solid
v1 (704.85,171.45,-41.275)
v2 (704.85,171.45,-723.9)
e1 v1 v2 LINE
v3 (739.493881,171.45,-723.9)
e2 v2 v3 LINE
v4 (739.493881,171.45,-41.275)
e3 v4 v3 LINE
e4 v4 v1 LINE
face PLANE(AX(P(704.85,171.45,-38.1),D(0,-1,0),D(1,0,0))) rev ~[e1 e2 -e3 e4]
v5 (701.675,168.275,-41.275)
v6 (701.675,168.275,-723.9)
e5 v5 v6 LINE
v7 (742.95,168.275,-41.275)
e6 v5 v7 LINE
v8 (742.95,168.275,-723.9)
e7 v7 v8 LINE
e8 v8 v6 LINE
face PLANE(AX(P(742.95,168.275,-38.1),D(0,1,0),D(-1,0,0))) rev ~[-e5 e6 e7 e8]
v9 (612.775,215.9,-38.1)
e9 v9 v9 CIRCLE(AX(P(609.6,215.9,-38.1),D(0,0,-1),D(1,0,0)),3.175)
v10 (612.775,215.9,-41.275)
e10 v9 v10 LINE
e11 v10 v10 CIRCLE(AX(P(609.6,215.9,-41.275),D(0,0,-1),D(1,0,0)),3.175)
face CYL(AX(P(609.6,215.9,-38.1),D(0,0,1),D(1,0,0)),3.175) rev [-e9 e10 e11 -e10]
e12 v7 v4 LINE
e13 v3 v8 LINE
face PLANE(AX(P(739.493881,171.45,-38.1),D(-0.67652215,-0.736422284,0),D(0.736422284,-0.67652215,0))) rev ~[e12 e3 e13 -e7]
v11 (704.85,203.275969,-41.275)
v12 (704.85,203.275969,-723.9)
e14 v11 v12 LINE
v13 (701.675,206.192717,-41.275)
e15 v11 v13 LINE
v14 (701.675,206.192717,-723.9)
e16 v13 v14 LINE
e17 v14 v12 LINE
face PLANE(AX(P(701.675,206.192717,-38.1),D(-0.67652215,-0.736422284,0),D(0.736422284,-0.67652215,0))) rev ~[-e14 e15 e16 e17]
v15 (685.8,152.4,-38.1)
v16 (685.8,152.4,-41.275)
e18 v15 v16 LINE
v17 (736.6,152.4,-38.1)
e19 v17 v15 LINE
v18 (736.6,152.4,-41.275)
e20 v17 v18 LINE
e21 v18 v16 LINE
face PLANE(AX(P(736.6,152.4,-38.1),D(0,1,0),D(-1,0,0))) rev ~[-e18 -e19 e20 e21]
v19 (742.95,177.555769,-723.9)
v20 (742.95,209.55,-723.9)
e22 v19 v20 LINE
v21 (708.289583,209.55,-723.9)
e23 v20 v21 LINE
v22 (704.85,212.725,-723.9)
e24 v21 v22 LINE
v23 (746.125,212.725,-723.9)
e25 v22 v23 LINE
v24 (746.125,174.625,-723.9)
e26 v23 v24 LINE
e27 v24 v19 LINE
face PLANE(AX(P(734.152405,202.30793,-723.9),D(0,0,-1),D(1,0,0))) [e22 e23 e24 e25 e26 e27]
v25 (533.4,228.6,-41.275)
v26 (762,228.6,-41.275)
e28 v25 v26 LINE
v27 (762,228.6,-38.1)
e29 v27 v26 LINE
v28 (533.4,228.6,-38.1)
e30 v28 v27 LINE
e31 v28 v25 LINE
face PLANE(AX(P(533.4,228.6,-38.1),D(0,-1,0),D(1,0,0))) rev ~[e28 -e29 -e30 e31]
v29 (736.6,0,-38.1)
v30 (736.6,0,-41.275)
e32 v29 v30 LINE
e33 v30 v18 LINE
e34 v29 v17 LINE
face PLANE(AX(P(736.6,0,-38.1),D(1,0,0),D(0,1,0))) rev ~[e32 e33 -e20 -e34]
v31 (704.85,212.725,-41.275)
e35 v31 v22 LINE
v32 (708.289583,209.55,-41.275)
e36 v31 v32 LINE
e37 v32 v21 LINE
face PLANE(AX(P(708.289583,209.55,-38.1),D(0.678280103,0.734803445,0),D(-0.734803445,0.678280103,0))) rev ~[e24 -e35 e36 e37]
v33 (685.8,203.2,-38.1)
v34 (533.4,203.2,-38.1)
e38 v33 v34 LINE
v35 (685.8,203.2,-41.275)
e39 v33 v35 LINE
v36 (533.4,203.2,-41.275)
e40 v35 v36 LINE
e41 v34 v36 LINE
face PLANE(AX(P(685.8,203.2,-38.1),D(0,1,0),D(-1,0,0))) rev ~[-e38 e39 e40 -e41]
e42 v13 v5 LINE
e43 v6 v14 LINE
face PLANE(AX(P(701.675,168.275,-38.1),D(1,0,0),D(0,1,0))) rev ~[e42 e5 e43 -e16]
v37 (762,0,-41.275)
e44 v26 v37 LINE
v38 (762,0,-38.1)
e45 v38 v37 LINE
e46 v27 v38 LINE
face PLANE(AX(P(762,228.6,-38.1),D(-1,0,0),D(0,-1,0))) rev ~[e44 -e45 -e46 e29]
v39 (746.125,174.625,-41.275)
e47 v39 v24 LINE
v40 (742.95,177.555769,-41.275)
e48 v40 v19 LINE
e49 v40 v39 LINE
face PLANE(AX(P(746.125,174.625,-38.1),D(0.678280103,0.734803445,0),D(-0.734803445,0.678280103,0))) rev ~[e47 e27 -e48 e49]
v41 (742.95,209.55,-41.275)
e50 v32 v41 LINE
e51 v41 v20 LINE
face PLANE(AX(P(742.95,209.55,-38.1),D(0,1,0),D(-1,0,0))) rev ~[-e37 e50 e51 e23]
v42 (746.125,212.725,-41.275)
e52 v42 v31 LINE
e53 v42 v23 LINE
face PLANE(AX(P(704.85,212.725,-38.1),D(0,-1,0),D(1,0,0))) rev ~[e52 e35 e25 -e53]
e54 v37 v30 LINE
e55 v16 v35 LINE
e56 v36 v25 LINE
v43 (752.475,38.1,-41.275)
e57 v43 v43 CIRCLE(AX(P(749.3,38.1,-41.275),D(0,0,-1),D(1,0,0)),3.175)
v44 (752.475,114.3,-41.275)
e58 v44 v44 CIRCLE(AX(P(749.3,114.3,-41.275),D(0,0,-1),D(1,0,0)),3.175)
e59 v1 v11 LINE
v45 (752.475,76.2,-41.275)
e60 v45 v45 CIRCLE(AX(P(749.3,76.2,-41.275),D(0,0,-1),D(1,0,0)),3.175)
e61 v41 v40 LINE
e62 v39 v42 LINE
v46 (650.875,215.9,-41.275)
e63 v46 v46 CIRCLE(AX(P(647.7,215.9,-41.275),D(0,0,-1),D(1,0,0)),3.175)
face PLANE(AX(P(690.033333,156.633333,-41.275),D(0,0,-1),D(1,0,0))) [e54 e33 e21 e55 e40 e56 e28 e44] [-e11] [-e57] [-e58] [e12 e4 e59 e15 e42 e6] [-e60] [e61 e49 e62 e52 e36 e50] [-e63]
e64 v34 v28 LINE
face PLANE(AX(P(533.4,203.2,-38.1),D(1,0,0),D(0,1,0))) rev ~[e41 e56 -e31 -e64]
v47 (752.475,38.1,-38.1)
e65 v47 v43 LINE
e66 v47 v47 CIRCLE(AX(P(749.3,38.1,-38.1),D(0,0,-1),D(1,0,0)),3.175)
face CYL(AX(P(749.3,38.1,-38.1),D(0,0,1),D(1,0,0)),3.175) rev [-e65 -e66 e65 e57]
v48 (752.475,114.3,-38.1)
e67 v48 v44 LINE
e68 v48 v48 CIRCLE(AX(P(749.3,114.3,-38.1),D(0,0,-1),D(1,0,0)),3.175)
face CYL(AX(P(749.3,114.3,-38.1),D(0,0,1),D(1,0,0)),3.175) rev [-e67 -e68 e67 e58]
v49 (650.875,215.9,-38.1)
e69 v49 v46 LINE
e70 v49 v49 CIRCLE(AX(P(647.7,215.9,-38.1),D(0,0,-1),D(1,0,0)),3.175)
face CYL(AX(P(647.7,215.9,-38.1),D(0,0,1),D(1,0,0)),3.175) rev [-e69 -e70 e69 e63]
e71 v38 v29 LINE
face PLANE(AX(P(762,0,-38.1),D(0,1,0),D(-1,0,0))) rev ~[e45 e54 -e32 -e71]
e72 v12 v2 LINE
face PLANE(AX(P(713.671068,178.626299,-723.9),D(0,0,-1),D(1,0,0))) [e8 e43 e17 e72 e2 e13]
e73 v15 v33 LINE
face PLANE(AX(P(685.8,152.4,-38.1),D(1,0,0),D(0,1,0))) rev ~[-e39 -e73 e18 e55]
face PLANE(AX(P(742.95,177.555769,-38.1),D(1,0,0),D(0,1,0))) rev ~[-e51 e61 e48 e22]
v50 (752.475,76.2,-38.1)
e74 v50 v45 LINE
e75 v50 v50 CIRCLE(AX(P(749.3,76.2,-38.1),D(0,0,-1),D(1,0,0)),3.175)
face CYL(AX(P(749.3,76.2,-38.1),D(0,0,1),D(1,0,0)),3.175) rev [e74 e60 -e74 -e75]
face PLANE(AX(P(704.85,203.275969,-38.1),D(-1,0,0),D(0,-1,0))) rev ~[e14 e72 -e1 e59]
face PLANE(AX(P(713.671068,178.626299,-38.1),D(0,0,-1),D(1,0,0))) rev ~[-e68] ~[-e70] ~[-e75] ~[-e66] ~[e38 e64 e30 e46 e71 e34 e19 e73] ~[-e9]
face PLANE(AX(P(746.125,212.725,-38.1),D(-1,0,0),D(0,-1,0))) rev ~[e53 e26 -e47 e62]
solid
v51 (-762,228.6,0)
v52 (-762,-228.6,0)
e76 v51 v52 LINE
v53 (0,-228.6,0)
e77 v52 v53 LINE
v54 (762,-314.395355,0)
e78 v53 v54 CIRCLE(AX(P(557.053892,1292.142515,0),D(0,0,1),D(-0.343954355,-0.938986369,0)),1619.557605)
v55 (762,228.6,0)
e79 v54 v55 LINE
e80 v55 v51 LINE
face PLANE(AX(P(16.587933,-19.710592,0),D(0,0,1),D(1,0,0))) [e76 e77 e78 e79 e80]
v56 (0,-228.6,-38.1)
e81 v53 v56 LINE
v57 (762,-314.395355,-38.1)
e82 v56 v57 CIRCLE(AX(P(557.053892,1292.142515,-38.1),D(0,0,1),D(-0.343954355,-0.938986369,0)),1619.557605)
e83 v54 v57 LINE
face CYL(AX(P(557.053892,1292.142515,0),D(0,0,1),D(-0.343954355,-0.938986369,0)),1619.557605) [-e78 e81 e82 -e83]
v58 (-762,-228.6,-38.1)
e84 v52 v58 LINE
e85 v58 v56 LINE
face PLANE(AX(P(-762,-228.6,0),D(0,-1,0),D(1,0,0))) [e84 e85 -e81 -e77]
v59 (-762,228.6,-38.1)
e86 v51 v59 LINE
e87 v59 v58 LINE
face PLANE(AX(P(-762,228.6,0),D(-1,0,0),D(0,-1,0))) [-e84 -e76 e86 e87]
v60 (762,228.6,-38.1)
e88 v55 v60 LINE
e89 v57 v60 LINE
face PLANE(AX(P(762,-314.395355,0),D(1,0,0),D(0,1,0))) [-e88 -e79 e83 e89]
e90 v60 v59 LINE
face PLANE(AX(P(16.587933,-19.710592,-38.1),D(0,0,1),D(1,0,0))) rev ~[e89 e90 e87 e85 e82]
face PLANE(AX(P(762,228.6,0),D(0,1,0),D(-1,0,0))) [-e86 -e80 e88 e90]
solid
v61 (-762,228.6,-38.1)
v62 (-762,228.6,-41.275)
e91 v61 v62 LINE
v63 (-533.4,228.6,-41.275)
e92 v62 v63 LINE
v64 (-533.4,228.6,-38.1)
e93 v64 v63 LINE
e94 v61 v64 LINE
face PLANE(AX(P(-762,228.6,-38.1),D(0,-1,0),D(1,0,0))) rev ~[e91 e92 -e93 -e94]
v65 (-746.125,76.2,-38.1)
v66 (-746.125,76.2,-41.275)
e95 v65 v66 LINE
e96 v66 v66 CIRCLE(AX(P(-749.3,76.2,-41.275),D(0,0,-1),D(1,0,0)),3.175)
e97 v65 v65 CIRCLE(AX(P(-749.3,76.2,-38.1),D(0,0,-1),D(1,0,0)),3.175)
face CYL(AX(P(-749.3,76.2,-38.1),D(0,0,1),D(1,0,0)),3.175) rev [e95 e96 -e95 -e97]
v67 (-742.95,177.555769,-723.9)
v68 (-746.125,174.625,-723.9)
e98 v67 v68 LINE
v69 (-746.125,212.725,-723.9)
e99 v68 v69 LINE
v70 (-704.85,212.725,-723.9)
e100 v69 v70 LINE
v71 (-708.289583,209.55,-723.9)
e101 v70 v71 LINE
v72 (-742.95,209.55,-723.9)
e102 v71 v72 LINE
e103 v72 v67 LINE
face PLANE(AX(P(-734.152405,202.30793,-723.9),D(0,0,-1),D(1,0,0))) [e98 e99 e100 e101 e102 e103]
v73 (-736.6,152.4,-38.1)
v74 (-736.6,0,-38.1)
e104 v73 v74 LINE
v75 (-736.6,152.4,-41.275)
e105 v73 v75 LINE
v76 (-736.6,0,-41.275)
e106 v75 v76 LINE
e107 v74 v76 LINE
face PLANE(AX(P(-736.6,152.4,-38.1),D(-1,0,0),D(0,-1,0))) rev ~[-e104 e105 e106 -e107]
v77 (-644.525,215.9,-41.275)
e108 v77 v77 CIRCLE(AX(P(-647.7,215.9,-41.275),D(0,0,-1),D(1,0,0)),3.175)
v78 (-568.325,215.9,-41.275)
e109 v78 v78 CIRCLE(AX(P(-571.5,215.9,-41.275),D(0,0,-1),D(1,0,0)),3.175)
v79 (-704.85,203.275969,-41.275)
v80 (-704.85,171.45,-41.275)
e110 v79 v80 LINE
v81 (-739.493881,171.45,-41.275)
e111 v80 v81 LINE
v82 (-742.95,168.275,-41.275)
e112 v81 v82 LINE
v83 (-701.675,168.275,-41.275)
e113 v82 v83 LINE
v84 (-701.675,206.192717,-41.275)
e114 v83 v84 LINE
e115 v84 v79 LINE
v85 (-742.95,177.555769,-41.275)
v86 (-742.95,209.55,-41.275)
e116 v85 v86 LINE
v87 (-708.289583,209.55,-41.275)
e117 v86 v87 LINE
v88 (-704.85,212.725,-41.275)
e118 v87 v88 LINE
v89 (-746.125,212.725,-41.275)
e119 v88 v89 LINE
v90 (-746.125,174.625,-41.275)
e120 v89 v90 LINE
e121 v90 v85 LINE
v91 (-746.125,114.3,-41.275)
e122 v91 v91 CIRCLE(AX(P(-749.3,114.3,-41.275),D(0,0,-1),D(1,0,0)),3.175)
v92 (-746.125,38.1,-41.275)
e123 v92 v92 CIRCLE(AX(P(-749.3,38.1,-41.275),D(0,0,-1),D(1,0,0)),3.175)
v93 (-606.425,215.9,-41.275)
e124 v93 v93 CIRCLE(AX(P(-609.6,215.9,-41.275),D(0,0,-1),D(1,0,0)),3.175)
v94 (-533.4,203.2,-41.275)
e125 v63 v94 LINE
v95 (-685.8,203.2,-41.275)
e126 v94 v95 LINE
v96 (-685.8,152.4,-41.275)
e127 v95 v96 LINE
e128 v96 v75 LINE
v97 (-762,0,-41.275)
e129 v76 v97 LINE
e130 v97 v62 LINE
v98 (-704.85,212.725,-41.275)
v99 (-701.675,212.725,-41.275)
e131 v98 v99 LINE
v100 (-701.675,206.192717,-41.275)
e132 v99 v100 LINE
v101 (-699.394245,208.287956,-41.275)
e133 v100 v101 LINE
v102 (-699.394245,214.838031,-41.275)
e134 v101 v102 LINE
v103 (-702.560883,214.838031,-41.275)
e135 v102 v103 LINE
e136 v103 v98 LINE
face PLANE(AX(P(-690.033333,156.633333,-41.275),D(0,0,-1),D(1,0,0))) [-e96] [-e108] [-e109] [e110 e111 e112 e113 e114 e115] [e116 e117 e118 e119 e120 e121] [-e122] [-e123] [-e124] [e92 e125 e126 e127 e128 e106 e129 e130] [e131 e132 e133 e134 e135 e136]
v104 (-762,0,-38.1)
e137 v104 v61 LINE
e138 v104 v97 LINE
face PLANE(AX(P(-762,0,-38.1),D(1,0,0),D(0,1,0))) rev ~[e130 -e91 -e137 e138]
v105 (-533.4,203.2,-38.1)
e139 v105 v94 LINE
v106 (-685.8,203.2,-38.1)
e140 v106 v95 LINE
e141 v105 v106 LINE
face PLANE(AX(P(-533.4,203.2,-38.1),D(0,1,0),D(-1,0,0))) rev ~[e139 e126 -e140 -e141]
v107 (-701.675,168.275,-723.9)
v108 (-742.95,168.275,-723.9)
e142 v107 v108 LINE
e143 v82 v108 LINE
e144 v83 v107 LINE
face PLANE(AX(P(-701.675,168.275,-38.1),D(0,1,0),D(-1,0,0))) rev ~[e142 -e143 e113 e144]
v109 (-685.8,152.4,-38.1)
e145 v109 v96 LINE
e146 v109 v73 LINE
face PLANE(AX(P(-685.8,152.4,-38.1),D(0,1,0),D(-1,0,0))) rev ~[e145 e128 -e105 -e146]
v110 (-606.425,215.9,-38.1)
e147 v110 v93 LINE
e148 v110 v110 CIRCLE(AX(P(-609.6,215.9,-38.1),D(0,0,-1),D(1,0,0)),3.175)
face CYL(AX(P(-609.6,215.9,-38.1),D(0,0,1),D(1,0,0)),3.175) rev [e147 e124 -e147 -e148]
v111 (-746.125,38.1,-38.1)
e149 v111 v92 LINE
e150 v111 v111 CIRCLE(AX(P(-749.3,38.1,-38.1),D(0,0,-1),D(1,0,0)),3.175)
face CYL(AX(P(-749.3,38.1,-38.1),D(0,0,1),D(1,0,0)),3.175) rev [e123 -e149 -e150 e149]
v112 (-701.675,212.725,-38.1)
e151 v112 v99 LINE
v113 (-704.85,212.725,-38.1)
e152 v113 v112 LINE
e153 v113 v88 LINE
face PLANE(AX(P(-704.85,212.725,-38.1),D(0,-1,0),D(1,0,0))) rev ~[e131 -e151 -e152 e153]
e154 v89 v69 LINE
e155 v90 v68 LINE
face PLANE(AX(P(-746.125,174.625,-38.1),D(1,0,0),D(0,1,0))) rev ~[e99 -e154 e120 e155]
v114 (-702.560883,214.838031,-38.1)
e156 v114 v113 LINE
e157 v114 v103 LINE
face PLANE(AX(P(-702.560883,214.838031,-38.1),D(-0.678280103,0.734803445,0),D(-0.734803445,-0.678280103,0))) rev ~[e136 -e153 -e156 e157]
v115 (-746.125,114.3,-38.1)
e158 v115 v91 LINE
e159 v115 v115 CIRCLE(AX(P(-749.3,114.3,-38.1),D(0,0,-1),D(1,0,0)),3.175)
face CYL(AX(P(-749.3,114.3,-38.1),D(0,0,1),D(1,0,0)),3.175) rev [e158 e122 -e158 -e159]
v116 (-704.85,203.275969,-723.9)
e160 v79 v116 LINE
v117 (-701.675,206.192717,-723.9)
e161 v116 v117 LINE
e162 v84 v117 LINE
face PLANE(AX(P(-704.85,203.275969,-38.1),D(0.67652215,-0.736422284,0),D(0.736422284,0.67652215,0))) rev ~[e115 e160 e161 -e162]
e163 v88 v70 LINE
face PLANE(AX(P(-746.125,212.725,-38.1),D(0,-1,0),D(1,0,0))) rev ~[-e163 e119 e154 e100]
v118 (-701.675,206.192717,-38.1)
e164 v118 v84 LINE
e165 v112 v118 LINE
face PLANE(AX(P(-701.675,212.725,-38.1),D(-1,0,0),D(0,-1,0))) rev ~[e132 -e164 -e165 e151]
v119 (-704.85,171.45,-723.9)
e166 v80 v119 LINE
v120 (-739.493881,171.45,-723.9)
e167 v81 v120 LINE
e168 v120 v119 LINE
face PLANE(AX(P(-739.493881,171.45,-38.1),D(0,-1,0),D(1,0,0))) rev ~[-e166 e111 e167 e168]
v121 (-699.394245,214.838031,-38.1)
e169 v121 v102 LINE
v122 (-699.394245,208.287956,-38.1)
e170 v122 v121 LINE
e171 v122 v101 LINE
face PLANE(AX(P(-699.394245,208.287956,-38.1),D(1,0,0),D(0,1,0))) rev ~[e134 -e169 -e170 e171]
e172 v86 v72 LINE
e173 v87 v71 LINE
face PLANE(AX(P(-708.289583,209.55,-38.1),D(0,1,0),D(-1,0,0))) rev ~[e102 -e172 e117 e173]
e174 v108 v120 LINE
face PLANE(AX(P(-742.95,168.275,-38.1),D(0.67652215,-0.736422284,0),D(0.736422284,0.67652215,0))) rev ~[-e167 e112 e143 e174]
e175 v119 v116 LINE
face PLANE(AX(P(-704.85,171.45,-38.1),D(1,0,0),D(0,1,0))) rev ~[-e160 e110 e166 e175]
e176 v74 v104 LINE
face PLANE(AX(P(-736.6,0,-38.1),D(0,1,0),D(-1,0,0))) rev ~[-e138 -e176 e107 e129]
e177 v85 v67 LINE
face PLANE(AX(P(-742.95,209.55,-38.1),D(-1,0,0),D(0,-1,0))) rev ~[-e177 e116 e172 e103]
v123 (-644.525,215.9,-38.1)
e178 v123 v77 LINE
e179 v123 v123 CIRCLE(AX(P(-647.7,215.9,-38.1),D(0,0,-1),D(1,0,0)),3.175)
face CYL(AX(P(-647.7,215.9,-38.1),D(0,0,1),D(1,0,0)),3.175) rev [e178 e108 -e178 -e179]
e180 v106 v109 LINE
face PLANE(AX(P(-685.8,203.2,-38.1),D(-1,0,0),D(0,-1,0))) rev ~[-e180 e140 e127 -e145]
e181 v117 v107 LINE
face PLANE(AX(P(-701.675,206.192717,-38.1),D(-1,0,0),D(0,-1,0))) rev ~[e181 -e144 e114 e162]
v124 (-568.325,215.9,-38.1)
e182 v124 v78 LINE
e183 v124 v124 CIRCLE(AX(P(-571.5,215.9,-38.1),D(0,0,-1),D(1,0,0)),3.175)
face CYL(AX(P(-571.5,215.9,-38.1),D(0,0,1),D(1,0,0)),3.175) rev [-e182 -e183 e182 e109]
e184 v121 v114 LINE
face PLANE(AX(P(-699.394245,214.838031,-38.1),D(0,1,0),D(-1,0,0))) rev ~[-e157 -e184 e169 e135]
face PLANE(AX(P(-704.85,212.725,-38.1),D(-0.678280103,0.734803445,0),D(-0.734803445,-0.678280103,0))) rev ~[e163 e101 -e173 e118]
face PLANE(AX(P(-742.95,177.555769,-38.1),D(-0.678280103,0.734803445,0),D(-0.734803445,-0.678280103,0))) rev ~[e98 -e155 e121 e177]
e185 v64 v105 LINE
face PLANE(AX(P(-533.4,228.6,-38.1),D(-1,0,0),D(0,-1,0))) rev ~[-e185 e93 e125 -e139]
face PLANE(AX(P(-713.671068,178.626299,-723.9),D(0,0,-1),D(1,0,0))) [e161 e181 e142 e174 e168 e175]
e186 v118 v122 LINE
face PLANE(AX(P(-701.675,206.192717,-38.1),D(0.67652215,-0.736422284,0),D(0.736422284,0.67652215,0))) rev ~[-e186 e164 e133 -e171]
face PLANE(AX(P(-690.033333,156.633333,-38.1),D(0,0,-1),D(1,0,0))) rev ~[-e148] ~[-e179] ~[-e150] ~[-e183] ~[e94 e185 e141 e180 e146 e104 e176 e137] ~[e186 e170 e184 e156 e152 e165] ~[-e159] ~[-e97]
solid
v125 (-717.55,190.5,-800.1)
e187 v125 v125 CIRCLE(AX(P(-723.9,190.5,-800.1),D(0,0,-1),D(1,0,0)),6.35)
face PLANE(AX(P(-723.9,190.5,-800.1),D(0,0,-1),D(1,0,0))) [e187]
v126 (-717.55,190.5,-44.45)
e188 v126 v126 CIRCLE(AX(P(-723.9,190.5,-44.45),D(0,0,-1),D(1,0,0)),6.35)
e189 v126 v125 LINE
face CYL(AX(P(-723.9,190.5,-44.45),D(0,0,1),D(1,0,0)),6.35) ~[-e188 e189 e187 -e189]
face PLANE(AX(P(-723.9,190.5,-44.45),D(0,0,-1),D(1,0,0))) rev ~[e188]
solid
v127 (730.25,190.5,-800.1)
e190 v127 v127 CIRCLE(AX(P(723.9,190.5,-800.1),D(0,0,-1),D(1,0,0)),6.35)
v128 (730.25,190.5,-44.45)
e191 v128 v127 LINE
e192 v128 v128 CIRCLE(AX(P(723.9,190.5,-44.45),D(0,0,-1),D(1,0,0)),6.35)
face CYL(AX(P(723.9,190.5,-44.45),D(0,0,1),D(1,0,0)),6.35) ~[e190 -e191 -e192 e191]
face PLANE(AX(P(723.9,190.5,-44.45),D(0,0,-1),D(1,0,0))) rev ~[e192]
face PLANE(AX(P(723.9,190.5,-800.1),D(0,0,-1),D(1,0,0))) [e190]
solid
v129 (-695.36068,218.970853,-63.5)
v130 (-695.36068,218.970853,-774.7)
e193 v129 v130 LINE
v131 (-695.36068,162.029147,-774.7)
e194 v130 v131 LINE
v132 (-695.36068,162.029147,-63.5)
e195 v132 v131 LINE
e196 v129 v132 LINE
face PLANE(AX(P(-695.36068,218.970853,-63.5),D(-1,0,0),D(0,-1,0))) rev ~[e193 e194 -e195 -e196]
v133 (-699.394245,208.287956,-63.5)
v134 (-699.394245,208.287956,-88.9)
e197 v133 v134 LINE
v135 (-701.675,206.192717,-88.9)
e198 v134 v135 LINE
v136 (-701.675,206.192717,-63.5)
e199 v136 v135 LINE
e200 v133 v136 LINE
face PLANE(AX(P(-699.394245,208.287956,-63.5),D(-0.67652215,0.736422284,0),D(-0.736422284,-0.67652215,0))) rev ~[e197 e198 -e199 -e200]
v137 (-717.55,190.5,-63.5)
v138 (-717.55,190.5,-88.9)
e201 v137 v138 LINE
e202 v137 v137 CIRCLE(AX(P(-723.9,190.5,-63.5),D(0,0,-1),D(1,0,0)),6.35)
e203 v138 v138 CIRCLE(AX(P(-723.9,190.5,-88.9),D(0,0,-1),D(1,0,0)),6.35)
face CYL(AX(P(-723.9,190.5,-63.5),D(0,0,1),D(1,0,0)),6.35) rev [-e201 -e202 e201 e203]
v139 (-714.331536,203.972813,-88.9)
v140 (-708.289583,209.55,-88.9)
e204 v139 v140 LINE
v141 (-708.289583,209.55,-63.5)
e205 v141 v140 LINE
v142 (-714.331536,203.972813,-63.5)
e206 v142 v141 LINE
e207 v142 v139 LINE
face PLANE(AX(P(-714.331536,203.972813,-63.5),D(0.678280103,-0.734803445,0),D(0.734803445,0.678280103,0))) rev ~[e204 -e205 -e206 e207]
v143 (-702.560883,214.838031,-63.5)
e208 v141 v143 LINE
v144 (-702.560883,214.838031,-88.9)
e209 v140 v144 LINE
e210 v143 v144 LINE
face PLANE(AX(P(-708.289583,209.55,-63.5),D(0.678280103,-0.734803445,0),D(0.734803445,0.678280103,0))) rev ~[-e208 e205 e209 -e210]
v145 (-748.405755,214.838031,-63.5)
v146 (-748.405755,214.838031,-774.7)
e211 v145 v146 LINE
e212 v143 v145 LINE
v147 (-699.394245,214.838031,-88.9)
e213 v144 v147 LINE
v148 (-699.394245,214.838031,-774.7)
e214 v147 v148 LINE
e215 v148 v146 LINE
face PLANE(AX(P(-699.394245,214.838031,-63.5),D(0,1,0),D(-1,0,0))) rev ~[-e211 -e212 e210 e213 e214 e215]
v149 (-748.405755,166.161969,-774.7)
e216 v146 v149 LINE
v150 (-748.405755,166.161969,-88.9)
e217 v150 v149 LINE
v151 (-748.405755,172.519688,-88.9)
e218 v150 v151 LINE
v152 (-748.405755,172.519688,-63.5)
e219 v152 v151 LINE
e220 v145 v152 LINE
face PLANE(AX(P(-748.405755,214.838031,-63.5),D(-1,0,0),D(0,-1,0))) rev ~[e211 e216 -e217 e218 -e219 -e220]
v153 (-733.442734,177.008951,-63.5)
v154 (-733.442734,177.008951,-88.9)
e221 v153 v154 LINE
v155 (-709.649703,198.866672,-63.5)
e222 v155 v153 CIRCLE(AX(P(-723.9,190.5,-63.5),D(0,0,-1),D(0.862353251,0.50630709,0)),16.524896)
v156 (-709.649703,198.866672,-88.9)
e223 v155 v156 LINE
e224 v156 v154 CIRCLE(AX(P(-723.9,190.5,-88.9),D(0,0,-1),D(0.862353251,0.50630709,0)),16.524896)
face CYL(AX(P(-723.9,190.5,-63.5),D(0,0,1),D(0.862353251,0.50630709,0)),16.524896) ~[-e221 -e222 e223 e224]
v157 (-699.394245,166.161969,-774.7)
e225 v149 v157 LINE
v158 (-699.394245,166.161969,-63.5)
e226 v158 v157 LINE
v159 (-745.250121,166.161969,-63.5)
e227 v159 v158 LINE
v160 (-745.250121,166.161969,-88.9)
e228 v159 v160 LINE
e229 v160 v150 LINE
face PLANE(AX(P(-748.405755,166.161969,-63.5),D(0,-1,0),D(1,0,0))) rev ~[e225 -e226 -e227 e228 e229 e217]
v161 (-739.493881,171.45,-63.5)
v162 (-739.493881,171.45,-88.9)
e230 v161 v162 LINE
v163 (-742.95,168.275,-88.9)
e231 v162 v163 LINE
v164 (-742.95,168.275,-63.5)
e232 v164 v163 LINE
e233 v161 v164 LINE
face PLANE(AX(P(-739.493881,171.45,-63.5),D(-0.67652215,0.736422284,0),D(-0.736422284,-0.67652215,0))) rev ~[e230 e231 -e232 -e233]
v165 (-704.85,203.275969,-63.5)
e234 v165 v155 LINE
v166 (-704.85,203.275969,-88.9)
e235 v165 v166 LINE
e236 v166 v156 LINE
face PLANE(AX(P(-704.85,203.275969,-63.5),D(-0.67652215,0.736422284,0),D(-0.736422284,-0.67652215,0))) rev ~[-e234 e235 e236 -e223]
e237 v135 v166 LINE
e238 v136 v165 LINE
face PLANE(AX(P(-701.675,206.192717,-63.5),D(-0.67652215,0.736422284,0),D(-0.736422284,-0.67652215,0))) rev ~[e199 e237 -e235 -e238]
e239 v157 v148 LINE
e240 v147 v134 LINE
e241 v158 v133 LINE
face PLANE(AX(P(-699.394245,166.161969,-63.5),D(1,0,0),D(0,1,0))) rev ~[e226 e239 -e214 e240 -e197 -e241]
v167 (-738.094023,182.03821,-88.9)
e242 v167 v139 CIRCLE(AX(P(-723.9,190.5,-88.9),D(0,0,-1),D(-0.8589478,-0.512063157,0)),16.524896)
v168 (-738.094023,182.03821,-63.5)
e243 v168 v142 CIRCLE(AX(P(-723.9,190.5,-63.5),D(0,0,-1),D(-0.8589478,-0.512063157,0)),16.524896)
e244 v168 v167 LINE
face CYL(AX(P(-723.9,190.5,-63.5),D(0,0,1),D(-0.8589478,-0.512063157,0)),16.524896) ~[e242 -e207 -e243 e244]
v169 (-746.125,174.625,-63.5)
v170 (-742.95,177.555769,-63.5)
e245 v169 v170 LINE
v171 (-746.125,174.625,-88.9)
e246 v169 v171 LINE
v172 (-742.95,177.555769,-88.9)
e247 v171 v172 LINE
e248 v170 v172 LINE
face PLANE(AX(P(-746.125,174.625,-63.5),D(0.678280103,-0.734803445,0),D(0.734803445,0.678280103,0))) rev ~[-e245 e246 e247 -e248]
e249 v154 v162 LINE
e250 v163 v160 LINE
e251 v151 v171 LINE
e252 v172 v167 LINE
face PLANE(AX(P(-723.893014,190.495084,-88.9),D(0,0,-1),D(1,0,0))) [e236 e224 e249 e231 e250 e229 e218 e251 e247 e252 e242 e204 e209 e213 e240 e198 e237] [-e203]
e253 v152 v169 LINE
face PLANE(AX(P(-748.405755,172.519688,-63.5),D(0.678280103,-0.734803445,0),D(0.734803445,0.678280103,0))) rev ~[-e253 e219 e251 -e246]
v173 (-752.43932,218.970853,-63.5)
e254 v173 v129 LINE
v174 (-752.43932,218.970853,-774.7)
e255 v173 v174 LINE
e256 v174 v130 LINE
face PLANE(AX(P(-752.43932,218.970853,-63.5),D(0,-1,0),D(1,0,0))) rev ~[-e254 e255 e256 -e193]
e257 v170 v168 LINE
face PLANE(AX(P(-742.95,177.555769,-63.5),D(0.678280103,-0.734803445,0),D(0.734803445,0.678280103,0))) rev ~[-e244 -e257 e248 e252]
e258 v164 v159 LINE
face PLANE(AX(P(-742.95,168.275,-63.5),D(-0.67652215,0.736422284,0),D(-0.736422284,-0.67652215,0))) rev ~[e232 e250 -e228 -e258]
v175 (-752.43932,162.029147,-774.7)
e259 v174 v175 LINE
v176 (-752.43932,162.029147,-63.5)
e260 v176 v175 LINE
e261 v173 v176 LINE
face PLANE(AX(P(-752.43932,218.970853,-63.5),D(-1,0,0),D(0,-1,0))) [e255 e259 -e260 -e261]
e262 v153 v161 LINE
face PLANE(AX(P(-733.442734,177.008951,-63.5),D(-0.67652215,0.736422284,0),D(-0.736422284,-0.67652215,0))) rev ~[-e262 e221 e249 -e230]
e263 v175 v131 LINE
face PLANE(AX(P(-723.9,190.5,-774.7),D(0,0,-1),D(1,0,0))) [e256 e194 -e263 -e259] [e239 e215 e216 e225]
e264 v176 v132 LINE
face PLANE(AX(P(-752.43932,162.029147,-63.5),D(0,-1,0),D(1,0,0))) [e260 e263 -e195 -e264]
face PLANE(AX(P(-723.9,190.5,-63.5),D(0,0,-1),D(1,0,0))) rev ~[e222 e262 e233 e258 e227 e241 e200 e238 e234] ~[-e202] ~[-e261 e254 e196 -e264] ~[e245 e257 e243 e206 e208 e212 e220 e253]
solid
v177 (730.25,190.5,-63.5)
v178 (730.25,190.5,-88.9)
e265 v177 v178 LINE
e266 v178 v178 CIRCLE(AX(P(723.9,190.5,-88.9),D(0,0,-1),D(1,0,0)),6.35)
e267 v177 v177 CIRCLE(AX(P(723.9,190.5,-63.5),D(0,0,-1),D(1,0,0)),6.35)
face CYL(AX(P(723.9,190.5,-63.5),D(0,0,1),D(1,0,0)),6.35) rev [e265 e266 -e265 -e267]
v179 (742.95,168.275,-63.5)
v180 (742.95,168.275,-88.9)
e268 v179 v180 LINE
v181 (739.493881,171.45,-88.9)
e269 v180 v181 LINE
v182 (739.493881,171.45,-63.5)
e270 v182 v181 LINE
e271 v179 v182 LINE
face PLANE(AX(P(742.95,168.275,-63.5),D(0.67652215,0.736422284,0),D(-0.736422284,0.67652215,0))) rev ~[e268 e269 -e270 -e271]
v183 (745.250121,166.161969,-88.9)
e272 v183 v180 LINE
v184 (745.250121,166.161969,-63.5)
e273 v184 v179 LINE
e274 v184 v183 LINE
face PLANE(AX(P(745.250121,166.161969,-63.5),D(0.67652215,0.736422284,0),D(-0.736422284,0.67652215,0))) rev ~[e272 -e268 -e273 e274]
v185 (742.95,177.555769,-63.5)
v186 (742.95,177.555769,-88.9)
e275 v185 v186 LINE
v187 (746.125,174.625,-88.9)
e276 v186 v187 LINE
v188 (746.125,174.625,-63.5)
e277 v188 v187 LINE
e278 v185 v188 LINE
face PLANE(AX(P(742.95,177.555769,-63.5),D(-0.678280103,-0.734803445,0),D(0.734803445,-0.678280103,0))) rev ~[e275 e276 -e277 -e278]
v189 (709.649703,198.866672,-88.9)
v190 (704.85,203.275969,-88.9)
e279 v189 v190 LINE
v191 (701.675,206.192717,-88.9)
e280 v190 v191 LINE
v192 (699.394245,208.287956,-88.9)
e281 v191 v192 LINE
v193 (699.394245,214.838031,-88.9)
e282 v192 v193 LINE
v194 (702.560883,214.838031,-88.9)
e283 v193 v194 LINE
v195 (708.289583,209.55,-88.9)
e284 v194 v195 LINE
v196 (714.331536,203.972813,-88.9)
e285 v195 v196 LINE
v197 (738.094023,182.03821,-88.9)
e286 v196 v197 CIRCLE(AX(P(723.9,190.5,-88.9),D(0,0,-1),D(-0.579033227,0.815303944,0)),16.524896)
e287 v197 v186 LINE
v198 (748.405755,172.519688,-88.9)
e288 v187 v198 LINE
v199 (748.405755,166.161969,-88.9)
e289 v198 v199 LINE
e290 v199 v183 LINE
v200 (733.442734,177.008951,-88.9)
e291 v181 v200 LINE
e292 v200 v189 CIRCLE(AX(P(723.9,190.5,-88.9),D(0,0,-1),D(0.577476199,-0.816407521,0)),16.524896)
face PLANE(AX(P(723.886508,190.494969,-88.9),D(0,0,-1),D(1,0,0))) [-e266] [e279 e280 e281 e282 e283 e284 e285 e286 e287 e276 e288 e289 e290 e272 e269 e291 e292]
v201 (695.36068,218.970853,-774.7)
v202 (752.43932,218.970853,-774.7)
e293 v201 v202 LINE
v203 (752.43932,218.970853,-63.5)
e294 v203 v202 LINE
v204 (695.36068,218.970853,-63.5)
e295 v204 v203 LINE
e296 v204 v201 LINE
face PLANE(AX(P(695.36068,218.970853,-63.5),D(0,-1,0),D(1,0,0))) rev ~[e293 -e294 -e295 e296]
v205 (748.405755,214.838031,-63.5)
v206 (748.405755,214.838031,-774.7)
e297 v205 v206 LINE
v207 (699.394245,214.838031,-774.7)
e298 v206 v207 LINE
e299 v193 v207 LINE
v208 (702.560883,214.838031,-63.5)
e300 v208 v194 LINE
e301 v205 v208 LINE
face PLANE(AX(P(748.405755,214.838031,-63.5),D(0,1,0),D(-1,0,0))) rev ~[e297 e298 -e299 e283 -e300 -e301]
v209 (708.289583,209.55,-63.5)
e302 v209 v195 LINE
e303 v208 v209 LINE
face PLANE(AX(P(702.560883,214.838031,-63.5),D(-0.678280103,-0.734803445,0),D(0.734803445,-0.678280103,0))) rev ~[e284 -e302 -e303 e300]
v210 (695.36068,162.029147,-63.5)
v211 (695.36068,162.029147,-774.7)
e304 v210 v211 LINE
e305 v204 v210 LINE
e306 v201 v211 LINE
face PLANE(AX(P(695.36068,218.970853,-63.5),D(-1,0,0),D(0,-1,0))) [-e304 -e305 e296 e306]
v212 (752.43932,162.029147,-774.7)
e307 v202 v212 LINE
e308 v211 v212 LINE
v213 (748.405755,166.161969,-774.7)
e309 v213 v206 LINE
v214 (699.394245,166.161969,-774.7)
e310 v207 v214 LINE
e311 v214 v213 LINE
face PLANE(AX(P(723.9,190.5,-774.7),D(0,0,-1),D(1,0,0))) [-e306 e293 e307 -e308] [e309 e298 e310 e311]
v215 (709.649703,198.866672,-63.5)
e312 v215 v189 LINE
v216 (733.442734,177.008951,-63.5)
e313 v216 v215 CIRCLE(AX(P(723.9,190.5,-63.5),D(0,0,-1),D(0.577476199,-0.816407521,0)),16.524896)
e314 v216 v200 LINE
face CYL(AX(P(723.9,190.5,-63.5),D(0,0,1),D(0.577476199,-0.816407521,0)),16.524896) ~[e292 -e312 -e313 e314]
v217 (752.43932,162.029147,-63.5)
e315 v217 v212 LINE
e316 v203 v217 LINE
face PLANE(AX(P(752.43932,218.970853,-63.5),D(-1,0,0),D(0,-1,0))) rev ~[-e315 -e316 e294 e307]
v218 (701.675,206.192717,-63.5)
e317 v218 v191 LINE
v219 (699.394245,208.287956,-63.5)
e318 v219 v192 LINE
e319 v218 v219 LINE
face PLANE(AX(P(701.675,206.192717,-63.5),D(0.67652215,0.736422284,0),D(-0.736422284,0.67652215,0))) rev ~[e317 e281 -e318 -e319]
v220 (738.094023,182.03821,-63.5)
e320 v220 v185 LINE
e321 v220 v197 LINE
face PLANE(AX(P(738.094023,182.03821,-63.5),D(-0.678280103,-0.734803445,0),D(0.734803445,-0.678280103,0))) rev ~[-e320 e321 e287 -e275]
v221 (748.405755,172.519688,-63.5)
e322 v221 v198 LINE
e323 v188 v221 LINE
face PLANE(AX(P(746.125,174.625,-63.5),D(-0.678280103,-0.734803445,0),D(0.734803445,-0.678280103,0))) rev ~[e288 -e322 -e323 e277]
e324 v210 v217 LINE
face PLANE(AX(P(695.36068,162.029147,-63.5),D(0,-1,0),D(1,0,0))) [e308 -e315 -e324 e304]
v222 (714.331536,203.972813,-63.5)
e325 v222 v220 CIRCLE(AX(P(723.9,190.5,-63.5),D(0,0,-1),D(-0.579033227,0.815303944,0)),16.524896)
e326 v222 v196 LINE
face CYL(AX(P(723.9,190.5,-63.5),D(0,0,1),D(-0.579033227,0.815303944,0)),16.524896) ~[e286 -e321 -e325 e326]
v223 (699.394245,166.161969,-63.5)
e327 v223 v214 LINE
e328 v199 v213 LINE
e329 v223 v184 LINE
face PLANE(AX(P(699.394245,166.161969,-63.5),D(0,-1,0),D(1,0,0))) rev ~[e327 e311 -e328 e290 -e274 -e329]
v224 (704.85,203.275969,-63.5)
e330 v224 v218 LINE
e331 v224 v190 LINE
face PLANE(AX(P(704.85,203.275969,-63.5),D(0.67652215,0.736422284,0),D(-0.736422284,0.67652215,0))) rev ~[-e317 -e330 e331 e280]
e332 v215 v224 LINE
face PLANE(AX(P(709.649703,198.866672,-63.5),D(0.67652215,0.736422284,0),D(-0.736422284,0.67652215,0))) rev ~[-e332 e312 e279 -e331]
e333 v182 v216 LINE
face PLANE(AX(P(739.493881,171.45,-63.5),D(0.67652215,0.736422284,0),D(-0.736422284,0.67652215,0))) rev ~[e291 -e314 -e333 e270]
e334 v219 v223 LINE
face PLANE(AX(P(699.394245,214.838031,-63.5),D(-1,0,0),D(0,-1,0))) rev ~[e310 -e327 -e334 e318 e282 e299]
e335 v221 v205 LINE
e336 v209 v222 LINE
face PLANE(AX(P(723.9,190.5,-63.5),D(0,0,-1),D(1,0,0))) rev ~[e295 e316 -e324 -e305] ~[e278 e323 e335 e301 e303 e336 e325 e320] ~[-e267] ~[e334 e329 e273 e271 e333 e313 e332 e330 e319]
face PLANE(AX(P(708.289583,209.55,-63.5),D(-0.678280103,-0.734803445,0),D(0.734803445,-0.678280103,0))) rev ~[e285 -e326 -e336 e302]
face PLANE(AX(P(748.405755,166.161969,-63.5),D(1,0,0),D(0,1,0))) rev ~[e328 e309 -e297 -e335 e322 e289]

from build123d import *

# Parameters (mm, degrees)
F1_DEPTH = 38.1
F2_R     = 3.175
F2_W     = 57.0786401749
F2_H     = 56.9417057037
F2_R_2   = 6.35
F3_DEPTH = 3.175
F4_DEPTH = 685.8
F5_START = 25.4
F5_DEPTH = 25.4
F6_START = 25.4
F6_DEPTH = 711.2
F7_START = 6.35
F7_DEPTH = 755.65


with BuildPart() as f1:
    # F0 (on Top) → F1 (new body)
    with BuildSketch(Plane.XY):
        with BuildLine():
            Line((762, -250.8953552246), (762, 0))
            Line((762, 0), (762, 228.6))
            Line((762, 228.6), (0, 228.6))
            Line((0, 228.6), (-762, 228.6))
            Line((-762, 228.6), (-762, 0))
            Line((-762, 0), (-762, -228.6))
            Line((-762, -228.6), (0, -228.6))
            ThreePointArc((0, -228.6), (375.8490807179, -317.246080689), (762, -314.3953552246))
            Line((762, -314.3953552246), (762, -250.8953552246))
        make_face()
    extrude(amount=-F1_DEPTH)


with BuildPart() as f3:
    # F2 (on face) → F3 (new body)
    with BuildSketch(Plane(origin=(0, 0, -38.1), x_dir=(1, 0, 0), z_dir=(0, 0, -1))):
        Polygon((-762, -152.4), (-762, -228.6), (-685.8, -228.6), (-533.4, -228.6), (-533.4, -203.2), (-685.8, -203.2), (-685.8, -152.4), (-736.6, -152.4), (-736.6, 0), (-762, 0), align=None)
        with Locations((-647.7, -215.9)):
            Circle(F2_R, mode=Mode.SUBTRACT)
        with Locations((-609.6, -215.9)):
            Circle(F2_R, mode=Mode.SUBTRACT)
        with Locations((-723.9, -190.5)):
            Rectangle(F2_W, F2_H, mode=Mode.SUBTRACT)
        with Locations((-571.5, -215.9)):
            Circle(F2_R, mode=Mode.SUBTRACT)
        with Locations((-749.3, -114.3)):
            Circle(F2_R, mode=Mode.SUBTRACT)
        with Locations((-749.3, -76.2)):
            Circle(F2_R, mode=Mode.SUBTRACT)
        with Locations((-749.3, -38.1)):
            Circle(F2_R, mode=Mode.SUBTRACT)
        with Locations((-723.9, -190.5)):
            Rectangle(F2_W, F2_H)
        Polygon((-748.4057545662, -166.1619693041), (-745.25012113, -166.1619693041), (-699.3942454338, -166.1619693041), (-699.3942454338, -208.2879563526), (-699.3942454338, -214.8380306959), (-702.5608834128, -214.8380306959), (-748.4057545662, -214.8380306959), (-748.4057545662, -172.5196880927), align=None, mode=Mode.SUBTRACT)
        Polygon((-742.95, -209.55), (-742.95, -177.5557692308), (-746.125, -174.625), (-746.125, -212.725), (-704.85, -212.725), (-708.2895833333, -209.55), align=None)
        Polygon((-701.675, -206.1927169561), (-704.85, -203.275969498), (-704.85, -209.55), (-708.2895833333, -209.55), (-704.85, -212.725), (-701.675, -212.725), align=None)
        Polygon((-746.125, -168.275), (-742.95, -168.275), (-745.25012113, -166.1619693041), (-748.4057545662, -166.1619693041), (-748.4057545662, -172.5196880927), (-746.125, -174.625), align=None)
        Polygon((-746.125, -212.725), (-746.125, -174.625), (-748.4057545662, -172.5196880927), (-748.4057545662, -214.8380306959), (-702.5608834128, -214.8380306959), (-704.85, -212.725), align=None)
        with BuildLine():
            Line((-738.0940227608, -182.0382097593), (-742.95, -177.5557692308))
            Line((-742.95, -177.5557692308), (-742.95, -209.55))
            Line((-742.95, -209.55), (-708.2895833333, -209.55))
            Line((-708.2895833333, -209.55), (-714.3315363447, -203.9728126049))
            ThreePointArc((-714.3315363447, -203.9728126049), (-735.1085079185, -202.642550245), (-738.0940227608, -182.0382097593))
        make_face()
        with BuildLine():
            Line((-739.4938814486, -171.45), (-742.95, -171.45))
            Line((-742.95, -171.45), (-742.95, -177.5557692308))
            Line((-742.95, -177.5557692308), (-738.0940227608, -182.0382097593))
            ThreePointArc((-738.0940227608, -182.0382097593), (-735.1085079185, -202.642550245), (-714.3315363447, -203.9728126049))
            Line((-714.3315363447, -203.9728126049), (-708.2895833333, -209.55))
            Line((-708.2895833333, -209.55), (-704.85, -209.55))
            Line((-704.85, -209.55), (-704.85, -203.275969498))
            Line((-704.85, -203.275969498), (-709.6497025066, -198.866671833))
            ThreePointArc((-709.6497025066, -198.866671833), (-712.7205420695, -178.3306985989), (-733.4427339264, -177.0089509147))
            Line((-733.4427339264, -177.0089509147), (-739.4938814486, -171.45))
        make_face()
        with Locations((-723.9, -190.5)):
            Circle(F2_R_2, mode=Mode.SUBTRACT)
        with BuildLine():
            Line((-704.85, -171.45), (-739.4938814486, -171.45))
            Line((-739.4938814486, -171.45), (-733.4427339264, -177.0089509147))
            ThreePointArc((-733.4427339264, -177.0089509147), (-712.7205420695, -178.3306985989), (-709.6497025066, -198.866671833))
            Line((-709.6497025066, -198.866671833), (-704.85, -203.275969498))
            Line((-704.85, -203.275969498), (-704.85, -171.45))
        make_face()
        Polygon((-742.95, -177.5557692308), (-742.95, -171.45), (-739.4938814486, -171.45), (-742.95, -168.275), (-746.125, -168.275), (-746.125, -174.625), align=None)
        Polygon((-742.95, -168.275), (-739.4938814486, -171.45), (-704.85, -171.45), (-704.85, -203.275969498), (-701.675, -206.1927169561), (-701.675, -168.275), align=None)
        Polygon((-745.25012113, -166.1619693041), (-742.95, -168.275), (-701.675, -168.275), (-701.675, -206.1927169561), (-699.3942454338, -208.2879563526), (-699.3942454338, -166.1619693041), align=None)
        with Locations((-723.9, -190.5)):
            Circle(F2_R_2)
    extrude(amount=F3_DEPTH)

    # F2 (on face) → F4 (join)
    with BuildSketch(Plane(origin=(0, 0, -38.1), x_dir=(1, 0, 0), z_dir=(0, 0, -1))):
        Polygon((-742.95, -209.55), (-742.95, -177.5557692308), (-746.125, -174.625), (-746.125, -212.725), (-704.85, -212.725), (-708.2895833333, -209.55), align=None)
        Polygon((-742.95, -168.275), (-739.4938814486, -171.45), (-704.85, -171.45), (-704.85, -203.275969498), (-701.675, -206.1927169561), (-701.675, -168.275), align=None)
    extrude(amount=F4_DEPTH)


with BuildPart() as f3b:
    # F2 (on face) → F3, piece 2 (new body)
    with BuildSketch(Plane(origin=(0, 0, -38.1), x_dir=(1, 0, 0), z_dir=(0, 0, -1))):
        Polygon((533.4, -203.2), (533.4, -228.6), (685.8, -228.6), (762, -228.6), (762, -152.4), (762, 0), (736.6, 0), (736.6, -152.4), (685.8, -152.4), (685.8, -203.2), align=None)
        with Locations((609.6, -215.9)):
            Circle(F2_R, mode=Mode.SUBTRACT)
        with Locations((647.7, -215.9)):
            Circle(F2_R, mode=Mode.SUBTRACT)
        with Locations((723.9, -190.5)):
            Rectangle(F2_W, F2_H, mode=Mode.SUBTRACT)
        with Locations((749.3, -114.3)):
            Circle(F2_R, mode=Mode.SUBTRACT)
        with Locations((749.3, -76.2)):
            Circle(F2_R, mode=Mode.SUBTRACT)
        with Locations((749.3, -38.1)):
            Circle(F2_R, mode=Mode.SUBTRACT)
        with Locations((723.9, -190.5)):
            Rectangle(F2_W, F2_H)
        Polygon((748.4057545662, -166.1619693041), (748.4057545662, -172.5196880927), (748.4057545662, -214.8380306959), (702.5608834128, -214.8380306959), (699.3942454338, -214.8380306959), (699.3942454338, -208.2879563526), (699.3942454338, -166.1619693041), (745.25012113, -166.1619693041), align=None, mode=Mode.SUBTRACT)
        with BuildLine():
            Line((742.95, -177.5557692308), (746.125, -174.625))
            Line((746.125, -174.625), (748.4057545662, -172.5196880927))
            Line((748.4057545662, -172.5196880927), (748.4057545662, -166.1619693041))
            Line((748.4057545662, -166.1619693041), (745.25012113, -166.1619693041))
            Line((745.25012113, -166.1619693041), (742.95, -168.275))
            Line((742.95, -168.275), (739.4938814486, -171.45))
            Line((739.4938814486, -171.45), (733.4427339264, -177.0089509147))
            ThreePointArc((733.4427339264, -177.0089509147), (712.7205420695, -178.3306985989), (709.6497025066, -198.866671833))
            Line((709.6497025066, -198.866671833), (704.85, -203.275969498))
            Line((704.85, -203.275969498), (701.675, -206.1927169561))
            Line((701.675, -206.1927169561), (699.3942454338, -208.2879563526))
            Line((699.3942454338, -208.2879563526), (699.3942454338, -214.8380306959))
            Line((699.3942454338, -214.8380306959), (702.5608834128, -214.8380306959))
            Line((702.5608834128, -214.8380306959), (704.85, -212.725))
            Line((704.85, -212.725), (708.2895833333, -209.55))
            Line((708.2895833333, -209.55), (714.3315363447, -203.9728126049))
            ThreePointArc((714.3315363447, -203.9728126049), (735.1085079185, -202.642550245), (738.0940227608, -182.0382097593))
            Line((738.0940227608, -182.0382097593), (742.95, -177.5557692308))
        make_face()
        with Locations((723.9, -190.5)):
            Circle(F2_R_2, mode=Mode.SUBTRACT)
        with BuildLine():
            Line((742.95, -209.55), (742.95, -177.5557692308))
            Line((742.95, -177.5557692308), (738.0940227608, -182.0382097593))
            ThreePointArc((738.0940227608, -182.0382097593), (735.1085079185, -202.642550245), (714.3315363447, -203.9728126049))
            Line((714.3315363447, -203.9728126049), (708.2895833333, -209.55))
            Line((708.2895833333, -209.55), (742.95, -209.55))
        make_face()
        with BuildLine():
            Line((733.4427339264, -177.0089509147), (739.4938814486, -171.45))
            Line((739.4938814486, -171.45), (704.85, -171.45))
            Line((704.85, -171.45), (704.85, -203.275969498))
            Line((704.85, -203.275969498), (709.6497025066, -198.866671833))
            ThreePointArc((709.6497025066, -198.866671833), (712.7205420695, -178.3306985989), (733.4427339264, -177.0089509147))
        make_face()
        Polygon((746.125, -212.725), (746.125, -174.625), (742.95, -177.5557692308), (742.95, -209.55), (708.2895833333, -209.55), (704.85, -212.725), align=None)
        Polygon((739.4938814486, -171.45), (742.95, -168.275), (701.675, -168.275), (701.675, -206.1927169561), (704.85, -203.275969498), (704.85, -171.45), align=None)
        Polygon((748.4057545662, -172.5196880927), (746.125, -174.625), (746.125, -212.725), (704.85, -212.725), (702.5608834128, -214.8380306959), (748.4057545662, -214.8380306959), align=None)
        Polygon((742.95, -168.275), (745.25012113, -166.1619693041), (699.3942454338, -166.1619693041), (699.3942454338, -208.2879563526), (701.675, -206.1927169561), (701.675, -168.275), align=None)
        with Locations((723.9, -190.5)):
            Circle(F2_R_2)
    extrude(amount=F3_DEPTH)

    # F2 (on face) → F4, piece 2 (join)
    with BuildSketch(Plane(origin=(0, 0, -38.1), x_dir=(1, 0, 0), z_dir=(0, 0, -1))):
        Polygon((739.4938814486, -171.45), (742.95, -168.275), (701.675, -168.275), (701.675, -206.1927169561), (704.85, -203.275969498), (704.85, -171.45), align=None)
        Polygon((746.125, -212.725), (746.125, -174.625), (742.95, -177.5557692308), (742.95, -209.55), (708.2895833333, -209.55), (704.85, -212.725), align=None)
    extrude(amount=F4_DEPTH)


with BuildPart() as f5:
    # F2 (on face) → F5 (new body)
    with BuildSketch(Plane(origin=(0, 0, -38.1), x_dir=(1, 0, 0), z_dir=(0, 0, -1)).offset(F5_START)):
        with BuildLine():
            Line((-739.4938814486, -171.45), (-742.95, -171.45))
            Line((-742.95, -171.45), (-742.95, -177.5557692308))
            Line((-742.95, -177.5557692308), (-738.0940227608, -182.0382097593))
            ThreePointArc((-738.0940227608, -182.0382097593), (-735.1085079185, -202.642550245), (-714.3315363447, -203.9728126049))
            Line((-714.3315363447, -203.9728126049), (-708.2895833333, -209.55))
            Line((-708.2895833333, -209.55), (-704.85, -209.55))
            Line((-704.85, -209.55), (-704.85, -203.275969498))
            Line((-704.85, -203.275969498), (-709.6497025066, -198.866671833))
            ThreePointArc((-709.6497025066, -198.866671833), (-712.7205420695, -178.3306985989), (-733.4427339264, -177.0089509147))
            Line((-733.4427339264, -177.0089509147), (-739.4938814486, -171.45))
        make_face()
        with Locations((-723.9, -190.5)):
            Circle(F2_R_2, mode=Mode.SUBTRACT)
        Polygon((-701.675, -206.1927169561), (-704.85, -203.275969498), (-704.85, -209.55), (-708.2895833333, -209.55), (-704.85, -212.725), (-701.675, -212.725), align=None)
        Polygon((-699.3942454338, -208.2879563526), (-701.675, -206.1927169561), (-701.675, -212.725), (-704.85, -212.725), (-702.5608834128, -214.8380306959), (-699.3942454338, -214.8380306959), align=None)
        Polygon((-742.95, -177.5557692308), (-742.95, -171.45), (-739.4938814486, -171.45), (-742.95, -168.275), (-746.125, -168.275), (-746.125, -174.625), align=None)
        Polygon((-746.125, -168.275), (-742.95, -168.275), (-745.25012113, -166.1619693041), (-748.4057545662, -166.1619693041), (-748.4057545662, -172.5196880927), (-746.125, -174.625), align=None)
    extrude(amount=F5_DEPTH)

    # F2 (on face) → F6 (join)
    with BuildSketch(Plane(origin=(0, 0, -38.1), x_dir=(1, 0, 0), z_dir=(0, 0, -1)).offset(F6_START)):
        with Locations((-723.9, -190.5)):
            Rectangle(F2_W, F2_H)
        Polygon((-748.4057545662, -166.1619693041), (-745.25012113, -166.1619693041), (-699.3942454338, -166.1619693041), (-699.3942454338, -208.2879563526), (-699.3942454338, -214.8380306959), (-702.5608834128, -214.8380306959), (-748.4057545662, -214.8380306959), (-748.4057545662, -172.5196880927), align=None, mode=Mode.SUBTRACT)
    extrude(amount=F6_DEPTH)


with BuildPart() as f5b:
    # F2 (on face) → F5, piece 2 (new body)
    with BuildSketch(Plane(origin=(0, 0, -38.1), x_dir=(1, 0, 0), z_dir=(0, 0, -1)).offset(F5_START)):
        with BuildLine():
            Line((742.95, -177.5557692308), (746.125, -174.625))
            Line((746.125, -174.625), (748.4057545662, -172.5196880927))
            Line((748.4057545662, -172.5196880927), (748.4057545662, -166.1619693041))
            Line((748.4057545662, -166.1619693041), (745.25012113, -166.1619693041))
            Line((745.25012113, -166.1619693041), (742.95, -168.275))
            Line((742.95, -168.275), (739.4938814486, -171.45))
            Line((739.4938814486, -171.45), (733.4427339264, -177.0089509147))
            ThreePointArc((733.4427339264, -177.0089509147), (712.7205420695, -178.3306985989), (709.6497025066, -198.866671833))
            Line((709.6497025066, -198.866671833), (704.85, -203.275969498))
            Line((704.85, -203.275969498), (701.675, -206.1927169561))
            Line((701.675, -206.1927169561), (699.3942454338, -208.2879563526))
            Line((699.3942454338, -208.2879563526), (699.3942454338, -214.8380306959))
            Line((699.3942454338, -214.8380306959), (702.5608834128, -214.8380306959))
            Line((702.5608834128, -214.8380306959), (704.85, -212.725))
            Line((704.85, -212.725), (708.2895833333, -209.55))
            Line((708.2895833333, -209.55), (714.3315363447, -203.9728126049))
            ThreePointArc((714.3315363447, -203.9728126049), (735.1085079185, -202.642550245), (738.0940227608, -182.0382097593))
            Line((738.0940227608, -182.0382097593), (742.95, -177.5557692308))
        make_face()
        with Locations((723.9, -190.5)):
            Circle(F2_R_2, mode=Mode.SUBTRACT)
    extrude(amount=F5_DEPTH)

    # F2 (on face) → F6, piece 2 (join)
    with BuildSketch(Plane(origin=(0, 0, -38.1), x_dir=(1, 0, 0), z_dir=(0, 0, -1)).offset(F6_START)):
        with Locations((723.9, -190.5)):
            Rectangle(F2_W, F2_H)
        Polygon((748.4057545662, -166.1619693041), (748.4057545662, -172.5196880927), (748.4057545662, -214.8380306959), (702.5608834128, -214.8380306959), (699.3942454338, -214.8380306959), (699.3942454338, -208.2879563526), (699.3942454338, -166.1619693041), (745.25012113, -166.1619693041), align=None, mode=Mode.SUBTRACT)
    extrude(amount=F6_DEPTH)


with BuildPart() as f7:
    # F2 (on face) → F7 (new body)
    with BuildSketch(Plane(origin=(0, 0, -38.1), x_dir=(1, 0, 0), z_dir=(0, 0, -1)).offset(F7_START)):
        with Locations((-723.9, -190.5)):
            Circle(F2_R_2)
    extrude(amount=F7_DEPTH)


with BuildPart() as f7b:
    # F2 (on face) → F7, piece 2 (new body)
    with BuildSketch(Plane(origin=(0, 0, -38.1), x_dir=(1, 0, 0), z_dir=(0, 0, -1)).offset(F7_START)):
        with Locations((723.9, -190.5)):
            Circle(F2_R_2)
    extrude(amount=F7_DEPTH)


solid = Compound([f1.part, f3.part, f3b.part, f5.part, f5b.part, f7.part, f7b.part])
